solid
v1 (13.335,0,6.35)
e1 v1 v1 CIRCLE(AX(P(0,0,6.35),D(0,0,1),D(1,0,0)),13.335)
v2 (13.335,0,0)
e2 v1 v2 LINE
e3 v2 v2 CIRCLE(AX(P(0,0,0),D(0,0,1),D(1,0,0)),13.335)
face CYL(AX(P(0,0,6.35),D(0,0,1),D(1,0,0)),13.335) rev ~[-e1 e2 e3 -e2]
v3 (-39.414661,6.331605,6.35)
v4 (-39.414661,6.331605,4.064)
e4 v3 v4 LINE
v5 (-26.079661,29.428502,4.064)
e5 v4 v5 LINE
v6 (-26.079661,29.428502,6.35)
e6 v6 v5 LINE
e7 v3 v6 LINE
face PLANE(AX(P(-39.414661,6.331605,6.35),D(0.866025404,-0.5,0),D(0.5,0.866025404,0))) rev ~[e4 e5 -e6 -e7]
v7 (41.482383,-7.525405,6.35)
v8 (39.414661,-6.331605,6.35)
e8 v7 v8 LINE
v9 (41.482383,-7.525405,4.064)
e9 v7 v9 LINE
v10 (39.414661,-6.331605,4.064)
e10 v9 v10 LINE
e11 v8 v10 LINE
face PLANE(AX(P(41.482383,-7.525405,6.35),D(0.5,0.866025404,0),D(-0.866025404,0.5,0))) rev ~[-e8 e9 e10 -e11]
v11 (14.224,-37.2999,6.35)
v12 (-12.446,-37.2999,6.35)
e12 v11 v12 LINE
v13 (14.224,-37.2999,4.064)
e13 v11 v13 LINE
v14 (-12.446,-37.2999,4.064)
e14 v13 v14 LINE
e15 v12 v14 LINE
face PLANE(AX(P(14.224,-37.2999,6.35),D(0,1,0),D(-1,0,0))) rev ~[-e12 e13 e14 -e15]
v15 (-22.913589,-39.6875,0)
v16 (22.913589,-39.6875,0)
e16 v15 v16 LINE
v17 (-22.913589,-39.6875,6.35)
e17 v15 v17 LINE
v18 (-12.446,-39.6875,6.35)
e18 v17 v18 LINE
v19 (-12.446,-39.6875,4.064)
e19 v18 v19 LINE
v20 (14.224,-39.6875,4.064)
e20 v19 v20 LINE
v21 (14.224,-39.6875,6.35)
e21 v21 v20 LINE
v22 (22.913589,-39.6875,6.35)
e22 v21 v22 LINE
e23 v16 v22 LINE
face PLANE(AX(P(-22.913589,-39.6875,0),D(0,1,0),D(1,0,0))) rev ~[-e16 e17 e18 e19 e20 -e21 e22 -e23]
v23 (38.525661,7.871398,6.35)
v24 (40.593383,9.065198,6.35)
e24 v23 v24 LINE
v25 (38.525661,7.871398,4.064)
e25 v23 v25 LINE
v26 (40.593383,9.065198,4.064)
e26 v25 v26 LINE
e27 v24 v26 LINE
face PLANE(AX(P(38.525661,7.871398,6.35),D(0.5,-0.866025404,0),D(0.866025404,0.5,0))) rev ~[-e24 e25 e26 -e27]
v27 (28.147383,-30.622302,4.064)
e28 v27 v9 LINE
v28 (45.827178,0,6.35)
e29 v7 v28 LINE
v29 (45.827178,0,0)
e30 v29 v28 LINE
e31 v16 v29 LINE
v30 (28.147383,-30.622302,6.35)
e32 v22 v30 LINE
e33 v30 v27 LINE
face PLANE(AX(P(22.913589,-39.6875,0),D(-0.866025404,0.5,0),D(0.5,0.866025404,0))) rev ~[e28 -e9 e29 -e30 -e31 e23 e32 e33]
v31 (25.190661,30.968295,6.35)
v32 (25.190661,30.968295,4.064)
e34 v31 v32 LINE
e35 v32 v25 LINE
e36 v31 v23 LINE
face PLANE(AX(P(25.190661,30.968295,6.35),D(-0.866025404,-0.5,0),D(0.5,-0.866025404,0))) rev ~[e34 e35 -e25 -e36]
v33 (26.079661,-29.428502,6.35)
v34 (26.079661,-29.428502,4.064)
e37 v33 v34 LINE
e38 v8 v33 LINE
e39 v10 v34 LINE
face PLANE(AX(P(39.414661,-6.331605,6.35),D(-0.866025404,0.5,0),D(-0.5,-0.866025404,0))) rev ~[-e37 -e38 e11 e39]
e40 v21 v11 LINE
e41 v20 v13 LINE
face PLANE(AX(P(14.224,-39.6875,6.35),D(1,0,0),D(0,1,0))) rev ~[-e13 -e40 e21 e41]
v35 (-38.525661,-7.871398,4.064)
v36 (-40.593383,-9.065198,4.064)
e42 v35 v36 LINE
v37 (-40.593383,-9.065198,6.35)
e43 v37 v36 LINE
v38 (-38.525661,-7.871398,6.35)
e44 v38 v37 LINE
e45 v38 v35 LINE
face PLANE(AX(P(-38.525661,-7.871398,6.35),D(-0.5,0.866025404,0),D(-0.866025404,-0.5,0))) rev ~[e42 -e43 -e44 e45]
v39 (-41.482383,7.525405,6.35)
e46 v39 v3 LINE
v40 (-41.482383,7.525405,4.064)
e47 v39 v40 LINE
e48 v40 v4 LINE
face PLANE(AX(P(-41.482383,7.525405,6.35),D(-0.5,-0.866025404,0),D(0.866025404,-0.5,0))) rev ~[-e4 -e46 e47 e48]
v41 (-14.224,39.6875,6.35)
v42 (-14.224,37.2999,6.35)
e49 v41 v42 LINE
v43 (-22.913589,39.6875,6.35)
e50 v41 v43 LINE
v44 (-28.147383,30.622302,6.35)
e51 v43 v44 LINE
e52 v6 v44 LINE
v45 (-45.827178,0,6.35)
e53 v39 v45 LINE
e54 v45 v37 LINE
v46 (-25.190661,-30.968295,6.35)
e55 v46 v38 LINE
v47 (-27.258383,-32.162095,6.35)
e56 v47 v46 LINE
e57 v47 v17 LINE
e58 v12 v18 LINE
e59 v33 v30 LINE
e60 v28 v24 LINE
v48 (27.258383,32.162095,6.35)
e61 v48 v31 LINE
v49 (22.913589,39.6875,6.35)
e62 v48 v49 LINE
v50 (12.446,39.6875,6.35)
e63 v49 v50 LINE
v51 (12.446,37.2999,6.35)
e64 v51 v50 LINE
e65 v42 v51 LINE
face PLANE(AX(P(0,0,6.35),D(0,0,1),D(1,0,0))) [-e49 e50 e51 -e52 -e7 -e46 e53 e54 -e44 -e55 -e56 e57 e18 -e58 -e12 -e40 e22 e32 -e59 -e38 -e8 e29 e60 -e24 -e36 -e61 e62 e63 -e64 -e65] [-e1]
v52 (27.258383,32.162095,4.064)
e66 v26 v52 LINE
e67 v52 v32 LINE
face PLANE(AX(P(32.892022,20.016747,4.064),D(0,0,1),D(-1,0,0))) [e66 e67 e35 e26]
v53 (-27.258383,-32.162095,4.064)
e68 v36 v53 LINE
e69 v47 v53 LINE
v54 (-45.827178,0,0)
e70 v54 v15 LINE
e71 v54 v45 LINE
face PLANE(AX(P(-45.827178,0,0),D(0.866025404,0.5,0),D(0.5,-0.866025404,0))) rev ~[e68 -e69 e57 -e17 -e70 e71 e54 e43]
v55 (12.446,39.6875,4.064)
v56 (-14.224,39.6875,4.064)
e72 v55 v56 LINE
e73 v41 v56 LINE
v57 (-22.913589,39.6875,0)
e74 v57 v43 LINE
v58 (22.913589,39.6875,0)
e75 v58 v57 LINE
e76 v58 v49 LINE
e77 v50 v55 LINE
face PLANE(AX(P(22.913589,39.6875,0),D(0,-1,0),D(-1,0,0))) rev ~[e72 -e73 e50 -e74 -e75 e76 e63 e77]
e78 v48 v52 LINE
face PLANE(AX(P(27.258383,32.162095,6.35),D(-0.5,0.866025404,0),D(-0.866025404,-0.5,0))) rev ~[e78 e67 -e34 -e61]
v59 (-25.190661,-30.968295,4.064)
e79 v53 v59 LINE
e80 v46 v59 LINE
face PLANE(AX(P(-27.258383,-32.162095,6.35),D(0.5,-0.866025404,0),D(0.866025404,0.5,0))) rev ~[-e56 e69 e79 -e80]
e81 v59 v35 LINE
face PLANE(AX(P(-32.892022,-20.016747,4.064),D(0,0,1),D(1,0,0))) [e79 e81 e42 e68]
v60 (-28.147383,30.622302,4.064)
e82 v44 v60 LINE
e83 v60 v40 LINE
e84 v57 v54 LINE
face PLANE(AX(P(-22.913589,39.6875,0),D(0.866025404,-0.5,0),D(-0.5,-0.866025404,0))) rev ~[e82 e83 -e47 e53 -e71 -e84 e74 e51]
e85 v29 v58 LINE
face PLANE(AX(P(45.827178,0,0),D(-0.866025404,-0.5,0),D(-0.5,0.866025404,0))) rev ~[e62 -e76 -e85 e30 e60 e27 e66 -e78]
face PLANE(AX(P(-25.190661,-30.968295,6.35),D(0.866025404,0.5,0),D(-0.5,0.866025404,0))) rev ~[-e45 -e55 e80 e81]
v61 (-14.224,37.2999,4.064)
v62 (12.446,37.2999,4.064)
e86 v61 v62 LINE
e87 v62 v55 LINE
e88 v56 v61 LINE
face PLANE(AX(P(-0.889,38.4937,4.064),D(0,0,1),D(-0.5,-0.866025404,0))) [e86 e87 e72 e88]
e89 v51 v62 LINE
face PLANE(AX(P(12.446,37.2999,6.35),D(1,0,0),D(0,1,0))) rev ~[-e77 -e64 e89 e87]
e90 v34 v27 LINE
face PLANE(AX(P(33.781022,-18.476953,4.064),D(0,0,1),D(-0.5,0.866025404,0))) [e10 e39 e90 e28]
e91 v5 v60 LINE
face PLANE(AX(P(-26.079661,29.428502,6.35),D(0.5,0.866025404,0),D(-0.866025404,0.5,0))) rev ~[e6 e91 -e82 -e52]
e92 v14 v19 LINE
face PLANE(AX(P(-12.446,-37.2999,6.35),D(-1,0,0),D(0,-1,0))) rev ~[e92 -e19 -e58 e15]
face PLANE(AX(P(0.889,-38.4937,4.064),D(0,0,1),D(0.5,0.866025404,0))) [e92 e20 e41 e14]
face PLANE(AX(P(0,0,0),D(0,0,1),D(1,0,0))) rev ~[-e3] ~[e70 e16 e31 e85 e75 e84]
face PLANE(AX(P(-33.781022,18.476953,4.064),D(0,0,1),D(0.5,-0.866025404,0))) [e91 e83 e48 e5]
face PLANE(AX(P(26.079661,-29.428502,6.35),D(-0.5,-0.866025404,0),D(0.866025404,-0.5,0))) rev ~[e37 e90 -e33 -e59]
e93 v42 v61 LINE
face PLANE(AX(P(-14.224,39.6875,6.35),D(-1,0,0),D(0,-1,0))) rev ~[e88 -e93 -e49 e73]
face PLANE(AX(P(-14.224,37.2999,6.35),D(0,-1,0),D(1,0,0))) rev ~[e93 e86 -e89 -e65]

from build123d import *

# Parameters (mm, degrees)
F1_DEPTH        = 6.35
F2_R            = 13.335
F3_DEPTH        = 25.4
F5_DEPTH        = 2.286
F5_COPIES_COUNT = 6


# Not quite as in the source:
# - a pattern or mirror of a feature is missing from the dataset's text; its kind, count and spacing are read off the source's solid


with BuildPart() as f1:
    # F0 (on Top) → F1 (new body)
    with BuildSketch(Plane.XY):
        Polygon((22.9135888085, 39.6875), (-22.9135888085, 39.6875), (-45.8271776169, 0), (-22.9135888085, -39.6875), (22.9135888085, -39.6875), (45.8271776169, 0), align=None)
    extrude(amount=F1_DEPTH)

    # F2 (on face) → F3 (cut)
    with BuildSketch(Plane.XY.offset(6.35)):
        Circle(F2_R)
    extrude(amount=-F3_DEPTH, mode=Mode.SUBTRACT)

    # F4 (on face) → F5 (cut)
    with BuildSketch(Plane.XY.offset(6.35)):
        Polygon((-38.5256609586, -7.8713978245), (-40.5933832127, -9.0651978245), (-27.2583832127, -32.1620953434), (-25.1906609586, -30.9682953434), align=None)
    f5 = extrude(amount=-F5_DEPTH, mode=Mode.SUBTRACT)

    # F5_copies: F5 ×6 about axis
    f5_copies_axis = Axis((0, 0, 0), (0, 0, 1))
    for i in range(1, F5_COPIES_COUNT):
        add(f5.rotate(f5_copies_axis, i * 360 / F5_COPIES_COUNT), mode=Mode.SUBTRACT)


solid = f1.part
